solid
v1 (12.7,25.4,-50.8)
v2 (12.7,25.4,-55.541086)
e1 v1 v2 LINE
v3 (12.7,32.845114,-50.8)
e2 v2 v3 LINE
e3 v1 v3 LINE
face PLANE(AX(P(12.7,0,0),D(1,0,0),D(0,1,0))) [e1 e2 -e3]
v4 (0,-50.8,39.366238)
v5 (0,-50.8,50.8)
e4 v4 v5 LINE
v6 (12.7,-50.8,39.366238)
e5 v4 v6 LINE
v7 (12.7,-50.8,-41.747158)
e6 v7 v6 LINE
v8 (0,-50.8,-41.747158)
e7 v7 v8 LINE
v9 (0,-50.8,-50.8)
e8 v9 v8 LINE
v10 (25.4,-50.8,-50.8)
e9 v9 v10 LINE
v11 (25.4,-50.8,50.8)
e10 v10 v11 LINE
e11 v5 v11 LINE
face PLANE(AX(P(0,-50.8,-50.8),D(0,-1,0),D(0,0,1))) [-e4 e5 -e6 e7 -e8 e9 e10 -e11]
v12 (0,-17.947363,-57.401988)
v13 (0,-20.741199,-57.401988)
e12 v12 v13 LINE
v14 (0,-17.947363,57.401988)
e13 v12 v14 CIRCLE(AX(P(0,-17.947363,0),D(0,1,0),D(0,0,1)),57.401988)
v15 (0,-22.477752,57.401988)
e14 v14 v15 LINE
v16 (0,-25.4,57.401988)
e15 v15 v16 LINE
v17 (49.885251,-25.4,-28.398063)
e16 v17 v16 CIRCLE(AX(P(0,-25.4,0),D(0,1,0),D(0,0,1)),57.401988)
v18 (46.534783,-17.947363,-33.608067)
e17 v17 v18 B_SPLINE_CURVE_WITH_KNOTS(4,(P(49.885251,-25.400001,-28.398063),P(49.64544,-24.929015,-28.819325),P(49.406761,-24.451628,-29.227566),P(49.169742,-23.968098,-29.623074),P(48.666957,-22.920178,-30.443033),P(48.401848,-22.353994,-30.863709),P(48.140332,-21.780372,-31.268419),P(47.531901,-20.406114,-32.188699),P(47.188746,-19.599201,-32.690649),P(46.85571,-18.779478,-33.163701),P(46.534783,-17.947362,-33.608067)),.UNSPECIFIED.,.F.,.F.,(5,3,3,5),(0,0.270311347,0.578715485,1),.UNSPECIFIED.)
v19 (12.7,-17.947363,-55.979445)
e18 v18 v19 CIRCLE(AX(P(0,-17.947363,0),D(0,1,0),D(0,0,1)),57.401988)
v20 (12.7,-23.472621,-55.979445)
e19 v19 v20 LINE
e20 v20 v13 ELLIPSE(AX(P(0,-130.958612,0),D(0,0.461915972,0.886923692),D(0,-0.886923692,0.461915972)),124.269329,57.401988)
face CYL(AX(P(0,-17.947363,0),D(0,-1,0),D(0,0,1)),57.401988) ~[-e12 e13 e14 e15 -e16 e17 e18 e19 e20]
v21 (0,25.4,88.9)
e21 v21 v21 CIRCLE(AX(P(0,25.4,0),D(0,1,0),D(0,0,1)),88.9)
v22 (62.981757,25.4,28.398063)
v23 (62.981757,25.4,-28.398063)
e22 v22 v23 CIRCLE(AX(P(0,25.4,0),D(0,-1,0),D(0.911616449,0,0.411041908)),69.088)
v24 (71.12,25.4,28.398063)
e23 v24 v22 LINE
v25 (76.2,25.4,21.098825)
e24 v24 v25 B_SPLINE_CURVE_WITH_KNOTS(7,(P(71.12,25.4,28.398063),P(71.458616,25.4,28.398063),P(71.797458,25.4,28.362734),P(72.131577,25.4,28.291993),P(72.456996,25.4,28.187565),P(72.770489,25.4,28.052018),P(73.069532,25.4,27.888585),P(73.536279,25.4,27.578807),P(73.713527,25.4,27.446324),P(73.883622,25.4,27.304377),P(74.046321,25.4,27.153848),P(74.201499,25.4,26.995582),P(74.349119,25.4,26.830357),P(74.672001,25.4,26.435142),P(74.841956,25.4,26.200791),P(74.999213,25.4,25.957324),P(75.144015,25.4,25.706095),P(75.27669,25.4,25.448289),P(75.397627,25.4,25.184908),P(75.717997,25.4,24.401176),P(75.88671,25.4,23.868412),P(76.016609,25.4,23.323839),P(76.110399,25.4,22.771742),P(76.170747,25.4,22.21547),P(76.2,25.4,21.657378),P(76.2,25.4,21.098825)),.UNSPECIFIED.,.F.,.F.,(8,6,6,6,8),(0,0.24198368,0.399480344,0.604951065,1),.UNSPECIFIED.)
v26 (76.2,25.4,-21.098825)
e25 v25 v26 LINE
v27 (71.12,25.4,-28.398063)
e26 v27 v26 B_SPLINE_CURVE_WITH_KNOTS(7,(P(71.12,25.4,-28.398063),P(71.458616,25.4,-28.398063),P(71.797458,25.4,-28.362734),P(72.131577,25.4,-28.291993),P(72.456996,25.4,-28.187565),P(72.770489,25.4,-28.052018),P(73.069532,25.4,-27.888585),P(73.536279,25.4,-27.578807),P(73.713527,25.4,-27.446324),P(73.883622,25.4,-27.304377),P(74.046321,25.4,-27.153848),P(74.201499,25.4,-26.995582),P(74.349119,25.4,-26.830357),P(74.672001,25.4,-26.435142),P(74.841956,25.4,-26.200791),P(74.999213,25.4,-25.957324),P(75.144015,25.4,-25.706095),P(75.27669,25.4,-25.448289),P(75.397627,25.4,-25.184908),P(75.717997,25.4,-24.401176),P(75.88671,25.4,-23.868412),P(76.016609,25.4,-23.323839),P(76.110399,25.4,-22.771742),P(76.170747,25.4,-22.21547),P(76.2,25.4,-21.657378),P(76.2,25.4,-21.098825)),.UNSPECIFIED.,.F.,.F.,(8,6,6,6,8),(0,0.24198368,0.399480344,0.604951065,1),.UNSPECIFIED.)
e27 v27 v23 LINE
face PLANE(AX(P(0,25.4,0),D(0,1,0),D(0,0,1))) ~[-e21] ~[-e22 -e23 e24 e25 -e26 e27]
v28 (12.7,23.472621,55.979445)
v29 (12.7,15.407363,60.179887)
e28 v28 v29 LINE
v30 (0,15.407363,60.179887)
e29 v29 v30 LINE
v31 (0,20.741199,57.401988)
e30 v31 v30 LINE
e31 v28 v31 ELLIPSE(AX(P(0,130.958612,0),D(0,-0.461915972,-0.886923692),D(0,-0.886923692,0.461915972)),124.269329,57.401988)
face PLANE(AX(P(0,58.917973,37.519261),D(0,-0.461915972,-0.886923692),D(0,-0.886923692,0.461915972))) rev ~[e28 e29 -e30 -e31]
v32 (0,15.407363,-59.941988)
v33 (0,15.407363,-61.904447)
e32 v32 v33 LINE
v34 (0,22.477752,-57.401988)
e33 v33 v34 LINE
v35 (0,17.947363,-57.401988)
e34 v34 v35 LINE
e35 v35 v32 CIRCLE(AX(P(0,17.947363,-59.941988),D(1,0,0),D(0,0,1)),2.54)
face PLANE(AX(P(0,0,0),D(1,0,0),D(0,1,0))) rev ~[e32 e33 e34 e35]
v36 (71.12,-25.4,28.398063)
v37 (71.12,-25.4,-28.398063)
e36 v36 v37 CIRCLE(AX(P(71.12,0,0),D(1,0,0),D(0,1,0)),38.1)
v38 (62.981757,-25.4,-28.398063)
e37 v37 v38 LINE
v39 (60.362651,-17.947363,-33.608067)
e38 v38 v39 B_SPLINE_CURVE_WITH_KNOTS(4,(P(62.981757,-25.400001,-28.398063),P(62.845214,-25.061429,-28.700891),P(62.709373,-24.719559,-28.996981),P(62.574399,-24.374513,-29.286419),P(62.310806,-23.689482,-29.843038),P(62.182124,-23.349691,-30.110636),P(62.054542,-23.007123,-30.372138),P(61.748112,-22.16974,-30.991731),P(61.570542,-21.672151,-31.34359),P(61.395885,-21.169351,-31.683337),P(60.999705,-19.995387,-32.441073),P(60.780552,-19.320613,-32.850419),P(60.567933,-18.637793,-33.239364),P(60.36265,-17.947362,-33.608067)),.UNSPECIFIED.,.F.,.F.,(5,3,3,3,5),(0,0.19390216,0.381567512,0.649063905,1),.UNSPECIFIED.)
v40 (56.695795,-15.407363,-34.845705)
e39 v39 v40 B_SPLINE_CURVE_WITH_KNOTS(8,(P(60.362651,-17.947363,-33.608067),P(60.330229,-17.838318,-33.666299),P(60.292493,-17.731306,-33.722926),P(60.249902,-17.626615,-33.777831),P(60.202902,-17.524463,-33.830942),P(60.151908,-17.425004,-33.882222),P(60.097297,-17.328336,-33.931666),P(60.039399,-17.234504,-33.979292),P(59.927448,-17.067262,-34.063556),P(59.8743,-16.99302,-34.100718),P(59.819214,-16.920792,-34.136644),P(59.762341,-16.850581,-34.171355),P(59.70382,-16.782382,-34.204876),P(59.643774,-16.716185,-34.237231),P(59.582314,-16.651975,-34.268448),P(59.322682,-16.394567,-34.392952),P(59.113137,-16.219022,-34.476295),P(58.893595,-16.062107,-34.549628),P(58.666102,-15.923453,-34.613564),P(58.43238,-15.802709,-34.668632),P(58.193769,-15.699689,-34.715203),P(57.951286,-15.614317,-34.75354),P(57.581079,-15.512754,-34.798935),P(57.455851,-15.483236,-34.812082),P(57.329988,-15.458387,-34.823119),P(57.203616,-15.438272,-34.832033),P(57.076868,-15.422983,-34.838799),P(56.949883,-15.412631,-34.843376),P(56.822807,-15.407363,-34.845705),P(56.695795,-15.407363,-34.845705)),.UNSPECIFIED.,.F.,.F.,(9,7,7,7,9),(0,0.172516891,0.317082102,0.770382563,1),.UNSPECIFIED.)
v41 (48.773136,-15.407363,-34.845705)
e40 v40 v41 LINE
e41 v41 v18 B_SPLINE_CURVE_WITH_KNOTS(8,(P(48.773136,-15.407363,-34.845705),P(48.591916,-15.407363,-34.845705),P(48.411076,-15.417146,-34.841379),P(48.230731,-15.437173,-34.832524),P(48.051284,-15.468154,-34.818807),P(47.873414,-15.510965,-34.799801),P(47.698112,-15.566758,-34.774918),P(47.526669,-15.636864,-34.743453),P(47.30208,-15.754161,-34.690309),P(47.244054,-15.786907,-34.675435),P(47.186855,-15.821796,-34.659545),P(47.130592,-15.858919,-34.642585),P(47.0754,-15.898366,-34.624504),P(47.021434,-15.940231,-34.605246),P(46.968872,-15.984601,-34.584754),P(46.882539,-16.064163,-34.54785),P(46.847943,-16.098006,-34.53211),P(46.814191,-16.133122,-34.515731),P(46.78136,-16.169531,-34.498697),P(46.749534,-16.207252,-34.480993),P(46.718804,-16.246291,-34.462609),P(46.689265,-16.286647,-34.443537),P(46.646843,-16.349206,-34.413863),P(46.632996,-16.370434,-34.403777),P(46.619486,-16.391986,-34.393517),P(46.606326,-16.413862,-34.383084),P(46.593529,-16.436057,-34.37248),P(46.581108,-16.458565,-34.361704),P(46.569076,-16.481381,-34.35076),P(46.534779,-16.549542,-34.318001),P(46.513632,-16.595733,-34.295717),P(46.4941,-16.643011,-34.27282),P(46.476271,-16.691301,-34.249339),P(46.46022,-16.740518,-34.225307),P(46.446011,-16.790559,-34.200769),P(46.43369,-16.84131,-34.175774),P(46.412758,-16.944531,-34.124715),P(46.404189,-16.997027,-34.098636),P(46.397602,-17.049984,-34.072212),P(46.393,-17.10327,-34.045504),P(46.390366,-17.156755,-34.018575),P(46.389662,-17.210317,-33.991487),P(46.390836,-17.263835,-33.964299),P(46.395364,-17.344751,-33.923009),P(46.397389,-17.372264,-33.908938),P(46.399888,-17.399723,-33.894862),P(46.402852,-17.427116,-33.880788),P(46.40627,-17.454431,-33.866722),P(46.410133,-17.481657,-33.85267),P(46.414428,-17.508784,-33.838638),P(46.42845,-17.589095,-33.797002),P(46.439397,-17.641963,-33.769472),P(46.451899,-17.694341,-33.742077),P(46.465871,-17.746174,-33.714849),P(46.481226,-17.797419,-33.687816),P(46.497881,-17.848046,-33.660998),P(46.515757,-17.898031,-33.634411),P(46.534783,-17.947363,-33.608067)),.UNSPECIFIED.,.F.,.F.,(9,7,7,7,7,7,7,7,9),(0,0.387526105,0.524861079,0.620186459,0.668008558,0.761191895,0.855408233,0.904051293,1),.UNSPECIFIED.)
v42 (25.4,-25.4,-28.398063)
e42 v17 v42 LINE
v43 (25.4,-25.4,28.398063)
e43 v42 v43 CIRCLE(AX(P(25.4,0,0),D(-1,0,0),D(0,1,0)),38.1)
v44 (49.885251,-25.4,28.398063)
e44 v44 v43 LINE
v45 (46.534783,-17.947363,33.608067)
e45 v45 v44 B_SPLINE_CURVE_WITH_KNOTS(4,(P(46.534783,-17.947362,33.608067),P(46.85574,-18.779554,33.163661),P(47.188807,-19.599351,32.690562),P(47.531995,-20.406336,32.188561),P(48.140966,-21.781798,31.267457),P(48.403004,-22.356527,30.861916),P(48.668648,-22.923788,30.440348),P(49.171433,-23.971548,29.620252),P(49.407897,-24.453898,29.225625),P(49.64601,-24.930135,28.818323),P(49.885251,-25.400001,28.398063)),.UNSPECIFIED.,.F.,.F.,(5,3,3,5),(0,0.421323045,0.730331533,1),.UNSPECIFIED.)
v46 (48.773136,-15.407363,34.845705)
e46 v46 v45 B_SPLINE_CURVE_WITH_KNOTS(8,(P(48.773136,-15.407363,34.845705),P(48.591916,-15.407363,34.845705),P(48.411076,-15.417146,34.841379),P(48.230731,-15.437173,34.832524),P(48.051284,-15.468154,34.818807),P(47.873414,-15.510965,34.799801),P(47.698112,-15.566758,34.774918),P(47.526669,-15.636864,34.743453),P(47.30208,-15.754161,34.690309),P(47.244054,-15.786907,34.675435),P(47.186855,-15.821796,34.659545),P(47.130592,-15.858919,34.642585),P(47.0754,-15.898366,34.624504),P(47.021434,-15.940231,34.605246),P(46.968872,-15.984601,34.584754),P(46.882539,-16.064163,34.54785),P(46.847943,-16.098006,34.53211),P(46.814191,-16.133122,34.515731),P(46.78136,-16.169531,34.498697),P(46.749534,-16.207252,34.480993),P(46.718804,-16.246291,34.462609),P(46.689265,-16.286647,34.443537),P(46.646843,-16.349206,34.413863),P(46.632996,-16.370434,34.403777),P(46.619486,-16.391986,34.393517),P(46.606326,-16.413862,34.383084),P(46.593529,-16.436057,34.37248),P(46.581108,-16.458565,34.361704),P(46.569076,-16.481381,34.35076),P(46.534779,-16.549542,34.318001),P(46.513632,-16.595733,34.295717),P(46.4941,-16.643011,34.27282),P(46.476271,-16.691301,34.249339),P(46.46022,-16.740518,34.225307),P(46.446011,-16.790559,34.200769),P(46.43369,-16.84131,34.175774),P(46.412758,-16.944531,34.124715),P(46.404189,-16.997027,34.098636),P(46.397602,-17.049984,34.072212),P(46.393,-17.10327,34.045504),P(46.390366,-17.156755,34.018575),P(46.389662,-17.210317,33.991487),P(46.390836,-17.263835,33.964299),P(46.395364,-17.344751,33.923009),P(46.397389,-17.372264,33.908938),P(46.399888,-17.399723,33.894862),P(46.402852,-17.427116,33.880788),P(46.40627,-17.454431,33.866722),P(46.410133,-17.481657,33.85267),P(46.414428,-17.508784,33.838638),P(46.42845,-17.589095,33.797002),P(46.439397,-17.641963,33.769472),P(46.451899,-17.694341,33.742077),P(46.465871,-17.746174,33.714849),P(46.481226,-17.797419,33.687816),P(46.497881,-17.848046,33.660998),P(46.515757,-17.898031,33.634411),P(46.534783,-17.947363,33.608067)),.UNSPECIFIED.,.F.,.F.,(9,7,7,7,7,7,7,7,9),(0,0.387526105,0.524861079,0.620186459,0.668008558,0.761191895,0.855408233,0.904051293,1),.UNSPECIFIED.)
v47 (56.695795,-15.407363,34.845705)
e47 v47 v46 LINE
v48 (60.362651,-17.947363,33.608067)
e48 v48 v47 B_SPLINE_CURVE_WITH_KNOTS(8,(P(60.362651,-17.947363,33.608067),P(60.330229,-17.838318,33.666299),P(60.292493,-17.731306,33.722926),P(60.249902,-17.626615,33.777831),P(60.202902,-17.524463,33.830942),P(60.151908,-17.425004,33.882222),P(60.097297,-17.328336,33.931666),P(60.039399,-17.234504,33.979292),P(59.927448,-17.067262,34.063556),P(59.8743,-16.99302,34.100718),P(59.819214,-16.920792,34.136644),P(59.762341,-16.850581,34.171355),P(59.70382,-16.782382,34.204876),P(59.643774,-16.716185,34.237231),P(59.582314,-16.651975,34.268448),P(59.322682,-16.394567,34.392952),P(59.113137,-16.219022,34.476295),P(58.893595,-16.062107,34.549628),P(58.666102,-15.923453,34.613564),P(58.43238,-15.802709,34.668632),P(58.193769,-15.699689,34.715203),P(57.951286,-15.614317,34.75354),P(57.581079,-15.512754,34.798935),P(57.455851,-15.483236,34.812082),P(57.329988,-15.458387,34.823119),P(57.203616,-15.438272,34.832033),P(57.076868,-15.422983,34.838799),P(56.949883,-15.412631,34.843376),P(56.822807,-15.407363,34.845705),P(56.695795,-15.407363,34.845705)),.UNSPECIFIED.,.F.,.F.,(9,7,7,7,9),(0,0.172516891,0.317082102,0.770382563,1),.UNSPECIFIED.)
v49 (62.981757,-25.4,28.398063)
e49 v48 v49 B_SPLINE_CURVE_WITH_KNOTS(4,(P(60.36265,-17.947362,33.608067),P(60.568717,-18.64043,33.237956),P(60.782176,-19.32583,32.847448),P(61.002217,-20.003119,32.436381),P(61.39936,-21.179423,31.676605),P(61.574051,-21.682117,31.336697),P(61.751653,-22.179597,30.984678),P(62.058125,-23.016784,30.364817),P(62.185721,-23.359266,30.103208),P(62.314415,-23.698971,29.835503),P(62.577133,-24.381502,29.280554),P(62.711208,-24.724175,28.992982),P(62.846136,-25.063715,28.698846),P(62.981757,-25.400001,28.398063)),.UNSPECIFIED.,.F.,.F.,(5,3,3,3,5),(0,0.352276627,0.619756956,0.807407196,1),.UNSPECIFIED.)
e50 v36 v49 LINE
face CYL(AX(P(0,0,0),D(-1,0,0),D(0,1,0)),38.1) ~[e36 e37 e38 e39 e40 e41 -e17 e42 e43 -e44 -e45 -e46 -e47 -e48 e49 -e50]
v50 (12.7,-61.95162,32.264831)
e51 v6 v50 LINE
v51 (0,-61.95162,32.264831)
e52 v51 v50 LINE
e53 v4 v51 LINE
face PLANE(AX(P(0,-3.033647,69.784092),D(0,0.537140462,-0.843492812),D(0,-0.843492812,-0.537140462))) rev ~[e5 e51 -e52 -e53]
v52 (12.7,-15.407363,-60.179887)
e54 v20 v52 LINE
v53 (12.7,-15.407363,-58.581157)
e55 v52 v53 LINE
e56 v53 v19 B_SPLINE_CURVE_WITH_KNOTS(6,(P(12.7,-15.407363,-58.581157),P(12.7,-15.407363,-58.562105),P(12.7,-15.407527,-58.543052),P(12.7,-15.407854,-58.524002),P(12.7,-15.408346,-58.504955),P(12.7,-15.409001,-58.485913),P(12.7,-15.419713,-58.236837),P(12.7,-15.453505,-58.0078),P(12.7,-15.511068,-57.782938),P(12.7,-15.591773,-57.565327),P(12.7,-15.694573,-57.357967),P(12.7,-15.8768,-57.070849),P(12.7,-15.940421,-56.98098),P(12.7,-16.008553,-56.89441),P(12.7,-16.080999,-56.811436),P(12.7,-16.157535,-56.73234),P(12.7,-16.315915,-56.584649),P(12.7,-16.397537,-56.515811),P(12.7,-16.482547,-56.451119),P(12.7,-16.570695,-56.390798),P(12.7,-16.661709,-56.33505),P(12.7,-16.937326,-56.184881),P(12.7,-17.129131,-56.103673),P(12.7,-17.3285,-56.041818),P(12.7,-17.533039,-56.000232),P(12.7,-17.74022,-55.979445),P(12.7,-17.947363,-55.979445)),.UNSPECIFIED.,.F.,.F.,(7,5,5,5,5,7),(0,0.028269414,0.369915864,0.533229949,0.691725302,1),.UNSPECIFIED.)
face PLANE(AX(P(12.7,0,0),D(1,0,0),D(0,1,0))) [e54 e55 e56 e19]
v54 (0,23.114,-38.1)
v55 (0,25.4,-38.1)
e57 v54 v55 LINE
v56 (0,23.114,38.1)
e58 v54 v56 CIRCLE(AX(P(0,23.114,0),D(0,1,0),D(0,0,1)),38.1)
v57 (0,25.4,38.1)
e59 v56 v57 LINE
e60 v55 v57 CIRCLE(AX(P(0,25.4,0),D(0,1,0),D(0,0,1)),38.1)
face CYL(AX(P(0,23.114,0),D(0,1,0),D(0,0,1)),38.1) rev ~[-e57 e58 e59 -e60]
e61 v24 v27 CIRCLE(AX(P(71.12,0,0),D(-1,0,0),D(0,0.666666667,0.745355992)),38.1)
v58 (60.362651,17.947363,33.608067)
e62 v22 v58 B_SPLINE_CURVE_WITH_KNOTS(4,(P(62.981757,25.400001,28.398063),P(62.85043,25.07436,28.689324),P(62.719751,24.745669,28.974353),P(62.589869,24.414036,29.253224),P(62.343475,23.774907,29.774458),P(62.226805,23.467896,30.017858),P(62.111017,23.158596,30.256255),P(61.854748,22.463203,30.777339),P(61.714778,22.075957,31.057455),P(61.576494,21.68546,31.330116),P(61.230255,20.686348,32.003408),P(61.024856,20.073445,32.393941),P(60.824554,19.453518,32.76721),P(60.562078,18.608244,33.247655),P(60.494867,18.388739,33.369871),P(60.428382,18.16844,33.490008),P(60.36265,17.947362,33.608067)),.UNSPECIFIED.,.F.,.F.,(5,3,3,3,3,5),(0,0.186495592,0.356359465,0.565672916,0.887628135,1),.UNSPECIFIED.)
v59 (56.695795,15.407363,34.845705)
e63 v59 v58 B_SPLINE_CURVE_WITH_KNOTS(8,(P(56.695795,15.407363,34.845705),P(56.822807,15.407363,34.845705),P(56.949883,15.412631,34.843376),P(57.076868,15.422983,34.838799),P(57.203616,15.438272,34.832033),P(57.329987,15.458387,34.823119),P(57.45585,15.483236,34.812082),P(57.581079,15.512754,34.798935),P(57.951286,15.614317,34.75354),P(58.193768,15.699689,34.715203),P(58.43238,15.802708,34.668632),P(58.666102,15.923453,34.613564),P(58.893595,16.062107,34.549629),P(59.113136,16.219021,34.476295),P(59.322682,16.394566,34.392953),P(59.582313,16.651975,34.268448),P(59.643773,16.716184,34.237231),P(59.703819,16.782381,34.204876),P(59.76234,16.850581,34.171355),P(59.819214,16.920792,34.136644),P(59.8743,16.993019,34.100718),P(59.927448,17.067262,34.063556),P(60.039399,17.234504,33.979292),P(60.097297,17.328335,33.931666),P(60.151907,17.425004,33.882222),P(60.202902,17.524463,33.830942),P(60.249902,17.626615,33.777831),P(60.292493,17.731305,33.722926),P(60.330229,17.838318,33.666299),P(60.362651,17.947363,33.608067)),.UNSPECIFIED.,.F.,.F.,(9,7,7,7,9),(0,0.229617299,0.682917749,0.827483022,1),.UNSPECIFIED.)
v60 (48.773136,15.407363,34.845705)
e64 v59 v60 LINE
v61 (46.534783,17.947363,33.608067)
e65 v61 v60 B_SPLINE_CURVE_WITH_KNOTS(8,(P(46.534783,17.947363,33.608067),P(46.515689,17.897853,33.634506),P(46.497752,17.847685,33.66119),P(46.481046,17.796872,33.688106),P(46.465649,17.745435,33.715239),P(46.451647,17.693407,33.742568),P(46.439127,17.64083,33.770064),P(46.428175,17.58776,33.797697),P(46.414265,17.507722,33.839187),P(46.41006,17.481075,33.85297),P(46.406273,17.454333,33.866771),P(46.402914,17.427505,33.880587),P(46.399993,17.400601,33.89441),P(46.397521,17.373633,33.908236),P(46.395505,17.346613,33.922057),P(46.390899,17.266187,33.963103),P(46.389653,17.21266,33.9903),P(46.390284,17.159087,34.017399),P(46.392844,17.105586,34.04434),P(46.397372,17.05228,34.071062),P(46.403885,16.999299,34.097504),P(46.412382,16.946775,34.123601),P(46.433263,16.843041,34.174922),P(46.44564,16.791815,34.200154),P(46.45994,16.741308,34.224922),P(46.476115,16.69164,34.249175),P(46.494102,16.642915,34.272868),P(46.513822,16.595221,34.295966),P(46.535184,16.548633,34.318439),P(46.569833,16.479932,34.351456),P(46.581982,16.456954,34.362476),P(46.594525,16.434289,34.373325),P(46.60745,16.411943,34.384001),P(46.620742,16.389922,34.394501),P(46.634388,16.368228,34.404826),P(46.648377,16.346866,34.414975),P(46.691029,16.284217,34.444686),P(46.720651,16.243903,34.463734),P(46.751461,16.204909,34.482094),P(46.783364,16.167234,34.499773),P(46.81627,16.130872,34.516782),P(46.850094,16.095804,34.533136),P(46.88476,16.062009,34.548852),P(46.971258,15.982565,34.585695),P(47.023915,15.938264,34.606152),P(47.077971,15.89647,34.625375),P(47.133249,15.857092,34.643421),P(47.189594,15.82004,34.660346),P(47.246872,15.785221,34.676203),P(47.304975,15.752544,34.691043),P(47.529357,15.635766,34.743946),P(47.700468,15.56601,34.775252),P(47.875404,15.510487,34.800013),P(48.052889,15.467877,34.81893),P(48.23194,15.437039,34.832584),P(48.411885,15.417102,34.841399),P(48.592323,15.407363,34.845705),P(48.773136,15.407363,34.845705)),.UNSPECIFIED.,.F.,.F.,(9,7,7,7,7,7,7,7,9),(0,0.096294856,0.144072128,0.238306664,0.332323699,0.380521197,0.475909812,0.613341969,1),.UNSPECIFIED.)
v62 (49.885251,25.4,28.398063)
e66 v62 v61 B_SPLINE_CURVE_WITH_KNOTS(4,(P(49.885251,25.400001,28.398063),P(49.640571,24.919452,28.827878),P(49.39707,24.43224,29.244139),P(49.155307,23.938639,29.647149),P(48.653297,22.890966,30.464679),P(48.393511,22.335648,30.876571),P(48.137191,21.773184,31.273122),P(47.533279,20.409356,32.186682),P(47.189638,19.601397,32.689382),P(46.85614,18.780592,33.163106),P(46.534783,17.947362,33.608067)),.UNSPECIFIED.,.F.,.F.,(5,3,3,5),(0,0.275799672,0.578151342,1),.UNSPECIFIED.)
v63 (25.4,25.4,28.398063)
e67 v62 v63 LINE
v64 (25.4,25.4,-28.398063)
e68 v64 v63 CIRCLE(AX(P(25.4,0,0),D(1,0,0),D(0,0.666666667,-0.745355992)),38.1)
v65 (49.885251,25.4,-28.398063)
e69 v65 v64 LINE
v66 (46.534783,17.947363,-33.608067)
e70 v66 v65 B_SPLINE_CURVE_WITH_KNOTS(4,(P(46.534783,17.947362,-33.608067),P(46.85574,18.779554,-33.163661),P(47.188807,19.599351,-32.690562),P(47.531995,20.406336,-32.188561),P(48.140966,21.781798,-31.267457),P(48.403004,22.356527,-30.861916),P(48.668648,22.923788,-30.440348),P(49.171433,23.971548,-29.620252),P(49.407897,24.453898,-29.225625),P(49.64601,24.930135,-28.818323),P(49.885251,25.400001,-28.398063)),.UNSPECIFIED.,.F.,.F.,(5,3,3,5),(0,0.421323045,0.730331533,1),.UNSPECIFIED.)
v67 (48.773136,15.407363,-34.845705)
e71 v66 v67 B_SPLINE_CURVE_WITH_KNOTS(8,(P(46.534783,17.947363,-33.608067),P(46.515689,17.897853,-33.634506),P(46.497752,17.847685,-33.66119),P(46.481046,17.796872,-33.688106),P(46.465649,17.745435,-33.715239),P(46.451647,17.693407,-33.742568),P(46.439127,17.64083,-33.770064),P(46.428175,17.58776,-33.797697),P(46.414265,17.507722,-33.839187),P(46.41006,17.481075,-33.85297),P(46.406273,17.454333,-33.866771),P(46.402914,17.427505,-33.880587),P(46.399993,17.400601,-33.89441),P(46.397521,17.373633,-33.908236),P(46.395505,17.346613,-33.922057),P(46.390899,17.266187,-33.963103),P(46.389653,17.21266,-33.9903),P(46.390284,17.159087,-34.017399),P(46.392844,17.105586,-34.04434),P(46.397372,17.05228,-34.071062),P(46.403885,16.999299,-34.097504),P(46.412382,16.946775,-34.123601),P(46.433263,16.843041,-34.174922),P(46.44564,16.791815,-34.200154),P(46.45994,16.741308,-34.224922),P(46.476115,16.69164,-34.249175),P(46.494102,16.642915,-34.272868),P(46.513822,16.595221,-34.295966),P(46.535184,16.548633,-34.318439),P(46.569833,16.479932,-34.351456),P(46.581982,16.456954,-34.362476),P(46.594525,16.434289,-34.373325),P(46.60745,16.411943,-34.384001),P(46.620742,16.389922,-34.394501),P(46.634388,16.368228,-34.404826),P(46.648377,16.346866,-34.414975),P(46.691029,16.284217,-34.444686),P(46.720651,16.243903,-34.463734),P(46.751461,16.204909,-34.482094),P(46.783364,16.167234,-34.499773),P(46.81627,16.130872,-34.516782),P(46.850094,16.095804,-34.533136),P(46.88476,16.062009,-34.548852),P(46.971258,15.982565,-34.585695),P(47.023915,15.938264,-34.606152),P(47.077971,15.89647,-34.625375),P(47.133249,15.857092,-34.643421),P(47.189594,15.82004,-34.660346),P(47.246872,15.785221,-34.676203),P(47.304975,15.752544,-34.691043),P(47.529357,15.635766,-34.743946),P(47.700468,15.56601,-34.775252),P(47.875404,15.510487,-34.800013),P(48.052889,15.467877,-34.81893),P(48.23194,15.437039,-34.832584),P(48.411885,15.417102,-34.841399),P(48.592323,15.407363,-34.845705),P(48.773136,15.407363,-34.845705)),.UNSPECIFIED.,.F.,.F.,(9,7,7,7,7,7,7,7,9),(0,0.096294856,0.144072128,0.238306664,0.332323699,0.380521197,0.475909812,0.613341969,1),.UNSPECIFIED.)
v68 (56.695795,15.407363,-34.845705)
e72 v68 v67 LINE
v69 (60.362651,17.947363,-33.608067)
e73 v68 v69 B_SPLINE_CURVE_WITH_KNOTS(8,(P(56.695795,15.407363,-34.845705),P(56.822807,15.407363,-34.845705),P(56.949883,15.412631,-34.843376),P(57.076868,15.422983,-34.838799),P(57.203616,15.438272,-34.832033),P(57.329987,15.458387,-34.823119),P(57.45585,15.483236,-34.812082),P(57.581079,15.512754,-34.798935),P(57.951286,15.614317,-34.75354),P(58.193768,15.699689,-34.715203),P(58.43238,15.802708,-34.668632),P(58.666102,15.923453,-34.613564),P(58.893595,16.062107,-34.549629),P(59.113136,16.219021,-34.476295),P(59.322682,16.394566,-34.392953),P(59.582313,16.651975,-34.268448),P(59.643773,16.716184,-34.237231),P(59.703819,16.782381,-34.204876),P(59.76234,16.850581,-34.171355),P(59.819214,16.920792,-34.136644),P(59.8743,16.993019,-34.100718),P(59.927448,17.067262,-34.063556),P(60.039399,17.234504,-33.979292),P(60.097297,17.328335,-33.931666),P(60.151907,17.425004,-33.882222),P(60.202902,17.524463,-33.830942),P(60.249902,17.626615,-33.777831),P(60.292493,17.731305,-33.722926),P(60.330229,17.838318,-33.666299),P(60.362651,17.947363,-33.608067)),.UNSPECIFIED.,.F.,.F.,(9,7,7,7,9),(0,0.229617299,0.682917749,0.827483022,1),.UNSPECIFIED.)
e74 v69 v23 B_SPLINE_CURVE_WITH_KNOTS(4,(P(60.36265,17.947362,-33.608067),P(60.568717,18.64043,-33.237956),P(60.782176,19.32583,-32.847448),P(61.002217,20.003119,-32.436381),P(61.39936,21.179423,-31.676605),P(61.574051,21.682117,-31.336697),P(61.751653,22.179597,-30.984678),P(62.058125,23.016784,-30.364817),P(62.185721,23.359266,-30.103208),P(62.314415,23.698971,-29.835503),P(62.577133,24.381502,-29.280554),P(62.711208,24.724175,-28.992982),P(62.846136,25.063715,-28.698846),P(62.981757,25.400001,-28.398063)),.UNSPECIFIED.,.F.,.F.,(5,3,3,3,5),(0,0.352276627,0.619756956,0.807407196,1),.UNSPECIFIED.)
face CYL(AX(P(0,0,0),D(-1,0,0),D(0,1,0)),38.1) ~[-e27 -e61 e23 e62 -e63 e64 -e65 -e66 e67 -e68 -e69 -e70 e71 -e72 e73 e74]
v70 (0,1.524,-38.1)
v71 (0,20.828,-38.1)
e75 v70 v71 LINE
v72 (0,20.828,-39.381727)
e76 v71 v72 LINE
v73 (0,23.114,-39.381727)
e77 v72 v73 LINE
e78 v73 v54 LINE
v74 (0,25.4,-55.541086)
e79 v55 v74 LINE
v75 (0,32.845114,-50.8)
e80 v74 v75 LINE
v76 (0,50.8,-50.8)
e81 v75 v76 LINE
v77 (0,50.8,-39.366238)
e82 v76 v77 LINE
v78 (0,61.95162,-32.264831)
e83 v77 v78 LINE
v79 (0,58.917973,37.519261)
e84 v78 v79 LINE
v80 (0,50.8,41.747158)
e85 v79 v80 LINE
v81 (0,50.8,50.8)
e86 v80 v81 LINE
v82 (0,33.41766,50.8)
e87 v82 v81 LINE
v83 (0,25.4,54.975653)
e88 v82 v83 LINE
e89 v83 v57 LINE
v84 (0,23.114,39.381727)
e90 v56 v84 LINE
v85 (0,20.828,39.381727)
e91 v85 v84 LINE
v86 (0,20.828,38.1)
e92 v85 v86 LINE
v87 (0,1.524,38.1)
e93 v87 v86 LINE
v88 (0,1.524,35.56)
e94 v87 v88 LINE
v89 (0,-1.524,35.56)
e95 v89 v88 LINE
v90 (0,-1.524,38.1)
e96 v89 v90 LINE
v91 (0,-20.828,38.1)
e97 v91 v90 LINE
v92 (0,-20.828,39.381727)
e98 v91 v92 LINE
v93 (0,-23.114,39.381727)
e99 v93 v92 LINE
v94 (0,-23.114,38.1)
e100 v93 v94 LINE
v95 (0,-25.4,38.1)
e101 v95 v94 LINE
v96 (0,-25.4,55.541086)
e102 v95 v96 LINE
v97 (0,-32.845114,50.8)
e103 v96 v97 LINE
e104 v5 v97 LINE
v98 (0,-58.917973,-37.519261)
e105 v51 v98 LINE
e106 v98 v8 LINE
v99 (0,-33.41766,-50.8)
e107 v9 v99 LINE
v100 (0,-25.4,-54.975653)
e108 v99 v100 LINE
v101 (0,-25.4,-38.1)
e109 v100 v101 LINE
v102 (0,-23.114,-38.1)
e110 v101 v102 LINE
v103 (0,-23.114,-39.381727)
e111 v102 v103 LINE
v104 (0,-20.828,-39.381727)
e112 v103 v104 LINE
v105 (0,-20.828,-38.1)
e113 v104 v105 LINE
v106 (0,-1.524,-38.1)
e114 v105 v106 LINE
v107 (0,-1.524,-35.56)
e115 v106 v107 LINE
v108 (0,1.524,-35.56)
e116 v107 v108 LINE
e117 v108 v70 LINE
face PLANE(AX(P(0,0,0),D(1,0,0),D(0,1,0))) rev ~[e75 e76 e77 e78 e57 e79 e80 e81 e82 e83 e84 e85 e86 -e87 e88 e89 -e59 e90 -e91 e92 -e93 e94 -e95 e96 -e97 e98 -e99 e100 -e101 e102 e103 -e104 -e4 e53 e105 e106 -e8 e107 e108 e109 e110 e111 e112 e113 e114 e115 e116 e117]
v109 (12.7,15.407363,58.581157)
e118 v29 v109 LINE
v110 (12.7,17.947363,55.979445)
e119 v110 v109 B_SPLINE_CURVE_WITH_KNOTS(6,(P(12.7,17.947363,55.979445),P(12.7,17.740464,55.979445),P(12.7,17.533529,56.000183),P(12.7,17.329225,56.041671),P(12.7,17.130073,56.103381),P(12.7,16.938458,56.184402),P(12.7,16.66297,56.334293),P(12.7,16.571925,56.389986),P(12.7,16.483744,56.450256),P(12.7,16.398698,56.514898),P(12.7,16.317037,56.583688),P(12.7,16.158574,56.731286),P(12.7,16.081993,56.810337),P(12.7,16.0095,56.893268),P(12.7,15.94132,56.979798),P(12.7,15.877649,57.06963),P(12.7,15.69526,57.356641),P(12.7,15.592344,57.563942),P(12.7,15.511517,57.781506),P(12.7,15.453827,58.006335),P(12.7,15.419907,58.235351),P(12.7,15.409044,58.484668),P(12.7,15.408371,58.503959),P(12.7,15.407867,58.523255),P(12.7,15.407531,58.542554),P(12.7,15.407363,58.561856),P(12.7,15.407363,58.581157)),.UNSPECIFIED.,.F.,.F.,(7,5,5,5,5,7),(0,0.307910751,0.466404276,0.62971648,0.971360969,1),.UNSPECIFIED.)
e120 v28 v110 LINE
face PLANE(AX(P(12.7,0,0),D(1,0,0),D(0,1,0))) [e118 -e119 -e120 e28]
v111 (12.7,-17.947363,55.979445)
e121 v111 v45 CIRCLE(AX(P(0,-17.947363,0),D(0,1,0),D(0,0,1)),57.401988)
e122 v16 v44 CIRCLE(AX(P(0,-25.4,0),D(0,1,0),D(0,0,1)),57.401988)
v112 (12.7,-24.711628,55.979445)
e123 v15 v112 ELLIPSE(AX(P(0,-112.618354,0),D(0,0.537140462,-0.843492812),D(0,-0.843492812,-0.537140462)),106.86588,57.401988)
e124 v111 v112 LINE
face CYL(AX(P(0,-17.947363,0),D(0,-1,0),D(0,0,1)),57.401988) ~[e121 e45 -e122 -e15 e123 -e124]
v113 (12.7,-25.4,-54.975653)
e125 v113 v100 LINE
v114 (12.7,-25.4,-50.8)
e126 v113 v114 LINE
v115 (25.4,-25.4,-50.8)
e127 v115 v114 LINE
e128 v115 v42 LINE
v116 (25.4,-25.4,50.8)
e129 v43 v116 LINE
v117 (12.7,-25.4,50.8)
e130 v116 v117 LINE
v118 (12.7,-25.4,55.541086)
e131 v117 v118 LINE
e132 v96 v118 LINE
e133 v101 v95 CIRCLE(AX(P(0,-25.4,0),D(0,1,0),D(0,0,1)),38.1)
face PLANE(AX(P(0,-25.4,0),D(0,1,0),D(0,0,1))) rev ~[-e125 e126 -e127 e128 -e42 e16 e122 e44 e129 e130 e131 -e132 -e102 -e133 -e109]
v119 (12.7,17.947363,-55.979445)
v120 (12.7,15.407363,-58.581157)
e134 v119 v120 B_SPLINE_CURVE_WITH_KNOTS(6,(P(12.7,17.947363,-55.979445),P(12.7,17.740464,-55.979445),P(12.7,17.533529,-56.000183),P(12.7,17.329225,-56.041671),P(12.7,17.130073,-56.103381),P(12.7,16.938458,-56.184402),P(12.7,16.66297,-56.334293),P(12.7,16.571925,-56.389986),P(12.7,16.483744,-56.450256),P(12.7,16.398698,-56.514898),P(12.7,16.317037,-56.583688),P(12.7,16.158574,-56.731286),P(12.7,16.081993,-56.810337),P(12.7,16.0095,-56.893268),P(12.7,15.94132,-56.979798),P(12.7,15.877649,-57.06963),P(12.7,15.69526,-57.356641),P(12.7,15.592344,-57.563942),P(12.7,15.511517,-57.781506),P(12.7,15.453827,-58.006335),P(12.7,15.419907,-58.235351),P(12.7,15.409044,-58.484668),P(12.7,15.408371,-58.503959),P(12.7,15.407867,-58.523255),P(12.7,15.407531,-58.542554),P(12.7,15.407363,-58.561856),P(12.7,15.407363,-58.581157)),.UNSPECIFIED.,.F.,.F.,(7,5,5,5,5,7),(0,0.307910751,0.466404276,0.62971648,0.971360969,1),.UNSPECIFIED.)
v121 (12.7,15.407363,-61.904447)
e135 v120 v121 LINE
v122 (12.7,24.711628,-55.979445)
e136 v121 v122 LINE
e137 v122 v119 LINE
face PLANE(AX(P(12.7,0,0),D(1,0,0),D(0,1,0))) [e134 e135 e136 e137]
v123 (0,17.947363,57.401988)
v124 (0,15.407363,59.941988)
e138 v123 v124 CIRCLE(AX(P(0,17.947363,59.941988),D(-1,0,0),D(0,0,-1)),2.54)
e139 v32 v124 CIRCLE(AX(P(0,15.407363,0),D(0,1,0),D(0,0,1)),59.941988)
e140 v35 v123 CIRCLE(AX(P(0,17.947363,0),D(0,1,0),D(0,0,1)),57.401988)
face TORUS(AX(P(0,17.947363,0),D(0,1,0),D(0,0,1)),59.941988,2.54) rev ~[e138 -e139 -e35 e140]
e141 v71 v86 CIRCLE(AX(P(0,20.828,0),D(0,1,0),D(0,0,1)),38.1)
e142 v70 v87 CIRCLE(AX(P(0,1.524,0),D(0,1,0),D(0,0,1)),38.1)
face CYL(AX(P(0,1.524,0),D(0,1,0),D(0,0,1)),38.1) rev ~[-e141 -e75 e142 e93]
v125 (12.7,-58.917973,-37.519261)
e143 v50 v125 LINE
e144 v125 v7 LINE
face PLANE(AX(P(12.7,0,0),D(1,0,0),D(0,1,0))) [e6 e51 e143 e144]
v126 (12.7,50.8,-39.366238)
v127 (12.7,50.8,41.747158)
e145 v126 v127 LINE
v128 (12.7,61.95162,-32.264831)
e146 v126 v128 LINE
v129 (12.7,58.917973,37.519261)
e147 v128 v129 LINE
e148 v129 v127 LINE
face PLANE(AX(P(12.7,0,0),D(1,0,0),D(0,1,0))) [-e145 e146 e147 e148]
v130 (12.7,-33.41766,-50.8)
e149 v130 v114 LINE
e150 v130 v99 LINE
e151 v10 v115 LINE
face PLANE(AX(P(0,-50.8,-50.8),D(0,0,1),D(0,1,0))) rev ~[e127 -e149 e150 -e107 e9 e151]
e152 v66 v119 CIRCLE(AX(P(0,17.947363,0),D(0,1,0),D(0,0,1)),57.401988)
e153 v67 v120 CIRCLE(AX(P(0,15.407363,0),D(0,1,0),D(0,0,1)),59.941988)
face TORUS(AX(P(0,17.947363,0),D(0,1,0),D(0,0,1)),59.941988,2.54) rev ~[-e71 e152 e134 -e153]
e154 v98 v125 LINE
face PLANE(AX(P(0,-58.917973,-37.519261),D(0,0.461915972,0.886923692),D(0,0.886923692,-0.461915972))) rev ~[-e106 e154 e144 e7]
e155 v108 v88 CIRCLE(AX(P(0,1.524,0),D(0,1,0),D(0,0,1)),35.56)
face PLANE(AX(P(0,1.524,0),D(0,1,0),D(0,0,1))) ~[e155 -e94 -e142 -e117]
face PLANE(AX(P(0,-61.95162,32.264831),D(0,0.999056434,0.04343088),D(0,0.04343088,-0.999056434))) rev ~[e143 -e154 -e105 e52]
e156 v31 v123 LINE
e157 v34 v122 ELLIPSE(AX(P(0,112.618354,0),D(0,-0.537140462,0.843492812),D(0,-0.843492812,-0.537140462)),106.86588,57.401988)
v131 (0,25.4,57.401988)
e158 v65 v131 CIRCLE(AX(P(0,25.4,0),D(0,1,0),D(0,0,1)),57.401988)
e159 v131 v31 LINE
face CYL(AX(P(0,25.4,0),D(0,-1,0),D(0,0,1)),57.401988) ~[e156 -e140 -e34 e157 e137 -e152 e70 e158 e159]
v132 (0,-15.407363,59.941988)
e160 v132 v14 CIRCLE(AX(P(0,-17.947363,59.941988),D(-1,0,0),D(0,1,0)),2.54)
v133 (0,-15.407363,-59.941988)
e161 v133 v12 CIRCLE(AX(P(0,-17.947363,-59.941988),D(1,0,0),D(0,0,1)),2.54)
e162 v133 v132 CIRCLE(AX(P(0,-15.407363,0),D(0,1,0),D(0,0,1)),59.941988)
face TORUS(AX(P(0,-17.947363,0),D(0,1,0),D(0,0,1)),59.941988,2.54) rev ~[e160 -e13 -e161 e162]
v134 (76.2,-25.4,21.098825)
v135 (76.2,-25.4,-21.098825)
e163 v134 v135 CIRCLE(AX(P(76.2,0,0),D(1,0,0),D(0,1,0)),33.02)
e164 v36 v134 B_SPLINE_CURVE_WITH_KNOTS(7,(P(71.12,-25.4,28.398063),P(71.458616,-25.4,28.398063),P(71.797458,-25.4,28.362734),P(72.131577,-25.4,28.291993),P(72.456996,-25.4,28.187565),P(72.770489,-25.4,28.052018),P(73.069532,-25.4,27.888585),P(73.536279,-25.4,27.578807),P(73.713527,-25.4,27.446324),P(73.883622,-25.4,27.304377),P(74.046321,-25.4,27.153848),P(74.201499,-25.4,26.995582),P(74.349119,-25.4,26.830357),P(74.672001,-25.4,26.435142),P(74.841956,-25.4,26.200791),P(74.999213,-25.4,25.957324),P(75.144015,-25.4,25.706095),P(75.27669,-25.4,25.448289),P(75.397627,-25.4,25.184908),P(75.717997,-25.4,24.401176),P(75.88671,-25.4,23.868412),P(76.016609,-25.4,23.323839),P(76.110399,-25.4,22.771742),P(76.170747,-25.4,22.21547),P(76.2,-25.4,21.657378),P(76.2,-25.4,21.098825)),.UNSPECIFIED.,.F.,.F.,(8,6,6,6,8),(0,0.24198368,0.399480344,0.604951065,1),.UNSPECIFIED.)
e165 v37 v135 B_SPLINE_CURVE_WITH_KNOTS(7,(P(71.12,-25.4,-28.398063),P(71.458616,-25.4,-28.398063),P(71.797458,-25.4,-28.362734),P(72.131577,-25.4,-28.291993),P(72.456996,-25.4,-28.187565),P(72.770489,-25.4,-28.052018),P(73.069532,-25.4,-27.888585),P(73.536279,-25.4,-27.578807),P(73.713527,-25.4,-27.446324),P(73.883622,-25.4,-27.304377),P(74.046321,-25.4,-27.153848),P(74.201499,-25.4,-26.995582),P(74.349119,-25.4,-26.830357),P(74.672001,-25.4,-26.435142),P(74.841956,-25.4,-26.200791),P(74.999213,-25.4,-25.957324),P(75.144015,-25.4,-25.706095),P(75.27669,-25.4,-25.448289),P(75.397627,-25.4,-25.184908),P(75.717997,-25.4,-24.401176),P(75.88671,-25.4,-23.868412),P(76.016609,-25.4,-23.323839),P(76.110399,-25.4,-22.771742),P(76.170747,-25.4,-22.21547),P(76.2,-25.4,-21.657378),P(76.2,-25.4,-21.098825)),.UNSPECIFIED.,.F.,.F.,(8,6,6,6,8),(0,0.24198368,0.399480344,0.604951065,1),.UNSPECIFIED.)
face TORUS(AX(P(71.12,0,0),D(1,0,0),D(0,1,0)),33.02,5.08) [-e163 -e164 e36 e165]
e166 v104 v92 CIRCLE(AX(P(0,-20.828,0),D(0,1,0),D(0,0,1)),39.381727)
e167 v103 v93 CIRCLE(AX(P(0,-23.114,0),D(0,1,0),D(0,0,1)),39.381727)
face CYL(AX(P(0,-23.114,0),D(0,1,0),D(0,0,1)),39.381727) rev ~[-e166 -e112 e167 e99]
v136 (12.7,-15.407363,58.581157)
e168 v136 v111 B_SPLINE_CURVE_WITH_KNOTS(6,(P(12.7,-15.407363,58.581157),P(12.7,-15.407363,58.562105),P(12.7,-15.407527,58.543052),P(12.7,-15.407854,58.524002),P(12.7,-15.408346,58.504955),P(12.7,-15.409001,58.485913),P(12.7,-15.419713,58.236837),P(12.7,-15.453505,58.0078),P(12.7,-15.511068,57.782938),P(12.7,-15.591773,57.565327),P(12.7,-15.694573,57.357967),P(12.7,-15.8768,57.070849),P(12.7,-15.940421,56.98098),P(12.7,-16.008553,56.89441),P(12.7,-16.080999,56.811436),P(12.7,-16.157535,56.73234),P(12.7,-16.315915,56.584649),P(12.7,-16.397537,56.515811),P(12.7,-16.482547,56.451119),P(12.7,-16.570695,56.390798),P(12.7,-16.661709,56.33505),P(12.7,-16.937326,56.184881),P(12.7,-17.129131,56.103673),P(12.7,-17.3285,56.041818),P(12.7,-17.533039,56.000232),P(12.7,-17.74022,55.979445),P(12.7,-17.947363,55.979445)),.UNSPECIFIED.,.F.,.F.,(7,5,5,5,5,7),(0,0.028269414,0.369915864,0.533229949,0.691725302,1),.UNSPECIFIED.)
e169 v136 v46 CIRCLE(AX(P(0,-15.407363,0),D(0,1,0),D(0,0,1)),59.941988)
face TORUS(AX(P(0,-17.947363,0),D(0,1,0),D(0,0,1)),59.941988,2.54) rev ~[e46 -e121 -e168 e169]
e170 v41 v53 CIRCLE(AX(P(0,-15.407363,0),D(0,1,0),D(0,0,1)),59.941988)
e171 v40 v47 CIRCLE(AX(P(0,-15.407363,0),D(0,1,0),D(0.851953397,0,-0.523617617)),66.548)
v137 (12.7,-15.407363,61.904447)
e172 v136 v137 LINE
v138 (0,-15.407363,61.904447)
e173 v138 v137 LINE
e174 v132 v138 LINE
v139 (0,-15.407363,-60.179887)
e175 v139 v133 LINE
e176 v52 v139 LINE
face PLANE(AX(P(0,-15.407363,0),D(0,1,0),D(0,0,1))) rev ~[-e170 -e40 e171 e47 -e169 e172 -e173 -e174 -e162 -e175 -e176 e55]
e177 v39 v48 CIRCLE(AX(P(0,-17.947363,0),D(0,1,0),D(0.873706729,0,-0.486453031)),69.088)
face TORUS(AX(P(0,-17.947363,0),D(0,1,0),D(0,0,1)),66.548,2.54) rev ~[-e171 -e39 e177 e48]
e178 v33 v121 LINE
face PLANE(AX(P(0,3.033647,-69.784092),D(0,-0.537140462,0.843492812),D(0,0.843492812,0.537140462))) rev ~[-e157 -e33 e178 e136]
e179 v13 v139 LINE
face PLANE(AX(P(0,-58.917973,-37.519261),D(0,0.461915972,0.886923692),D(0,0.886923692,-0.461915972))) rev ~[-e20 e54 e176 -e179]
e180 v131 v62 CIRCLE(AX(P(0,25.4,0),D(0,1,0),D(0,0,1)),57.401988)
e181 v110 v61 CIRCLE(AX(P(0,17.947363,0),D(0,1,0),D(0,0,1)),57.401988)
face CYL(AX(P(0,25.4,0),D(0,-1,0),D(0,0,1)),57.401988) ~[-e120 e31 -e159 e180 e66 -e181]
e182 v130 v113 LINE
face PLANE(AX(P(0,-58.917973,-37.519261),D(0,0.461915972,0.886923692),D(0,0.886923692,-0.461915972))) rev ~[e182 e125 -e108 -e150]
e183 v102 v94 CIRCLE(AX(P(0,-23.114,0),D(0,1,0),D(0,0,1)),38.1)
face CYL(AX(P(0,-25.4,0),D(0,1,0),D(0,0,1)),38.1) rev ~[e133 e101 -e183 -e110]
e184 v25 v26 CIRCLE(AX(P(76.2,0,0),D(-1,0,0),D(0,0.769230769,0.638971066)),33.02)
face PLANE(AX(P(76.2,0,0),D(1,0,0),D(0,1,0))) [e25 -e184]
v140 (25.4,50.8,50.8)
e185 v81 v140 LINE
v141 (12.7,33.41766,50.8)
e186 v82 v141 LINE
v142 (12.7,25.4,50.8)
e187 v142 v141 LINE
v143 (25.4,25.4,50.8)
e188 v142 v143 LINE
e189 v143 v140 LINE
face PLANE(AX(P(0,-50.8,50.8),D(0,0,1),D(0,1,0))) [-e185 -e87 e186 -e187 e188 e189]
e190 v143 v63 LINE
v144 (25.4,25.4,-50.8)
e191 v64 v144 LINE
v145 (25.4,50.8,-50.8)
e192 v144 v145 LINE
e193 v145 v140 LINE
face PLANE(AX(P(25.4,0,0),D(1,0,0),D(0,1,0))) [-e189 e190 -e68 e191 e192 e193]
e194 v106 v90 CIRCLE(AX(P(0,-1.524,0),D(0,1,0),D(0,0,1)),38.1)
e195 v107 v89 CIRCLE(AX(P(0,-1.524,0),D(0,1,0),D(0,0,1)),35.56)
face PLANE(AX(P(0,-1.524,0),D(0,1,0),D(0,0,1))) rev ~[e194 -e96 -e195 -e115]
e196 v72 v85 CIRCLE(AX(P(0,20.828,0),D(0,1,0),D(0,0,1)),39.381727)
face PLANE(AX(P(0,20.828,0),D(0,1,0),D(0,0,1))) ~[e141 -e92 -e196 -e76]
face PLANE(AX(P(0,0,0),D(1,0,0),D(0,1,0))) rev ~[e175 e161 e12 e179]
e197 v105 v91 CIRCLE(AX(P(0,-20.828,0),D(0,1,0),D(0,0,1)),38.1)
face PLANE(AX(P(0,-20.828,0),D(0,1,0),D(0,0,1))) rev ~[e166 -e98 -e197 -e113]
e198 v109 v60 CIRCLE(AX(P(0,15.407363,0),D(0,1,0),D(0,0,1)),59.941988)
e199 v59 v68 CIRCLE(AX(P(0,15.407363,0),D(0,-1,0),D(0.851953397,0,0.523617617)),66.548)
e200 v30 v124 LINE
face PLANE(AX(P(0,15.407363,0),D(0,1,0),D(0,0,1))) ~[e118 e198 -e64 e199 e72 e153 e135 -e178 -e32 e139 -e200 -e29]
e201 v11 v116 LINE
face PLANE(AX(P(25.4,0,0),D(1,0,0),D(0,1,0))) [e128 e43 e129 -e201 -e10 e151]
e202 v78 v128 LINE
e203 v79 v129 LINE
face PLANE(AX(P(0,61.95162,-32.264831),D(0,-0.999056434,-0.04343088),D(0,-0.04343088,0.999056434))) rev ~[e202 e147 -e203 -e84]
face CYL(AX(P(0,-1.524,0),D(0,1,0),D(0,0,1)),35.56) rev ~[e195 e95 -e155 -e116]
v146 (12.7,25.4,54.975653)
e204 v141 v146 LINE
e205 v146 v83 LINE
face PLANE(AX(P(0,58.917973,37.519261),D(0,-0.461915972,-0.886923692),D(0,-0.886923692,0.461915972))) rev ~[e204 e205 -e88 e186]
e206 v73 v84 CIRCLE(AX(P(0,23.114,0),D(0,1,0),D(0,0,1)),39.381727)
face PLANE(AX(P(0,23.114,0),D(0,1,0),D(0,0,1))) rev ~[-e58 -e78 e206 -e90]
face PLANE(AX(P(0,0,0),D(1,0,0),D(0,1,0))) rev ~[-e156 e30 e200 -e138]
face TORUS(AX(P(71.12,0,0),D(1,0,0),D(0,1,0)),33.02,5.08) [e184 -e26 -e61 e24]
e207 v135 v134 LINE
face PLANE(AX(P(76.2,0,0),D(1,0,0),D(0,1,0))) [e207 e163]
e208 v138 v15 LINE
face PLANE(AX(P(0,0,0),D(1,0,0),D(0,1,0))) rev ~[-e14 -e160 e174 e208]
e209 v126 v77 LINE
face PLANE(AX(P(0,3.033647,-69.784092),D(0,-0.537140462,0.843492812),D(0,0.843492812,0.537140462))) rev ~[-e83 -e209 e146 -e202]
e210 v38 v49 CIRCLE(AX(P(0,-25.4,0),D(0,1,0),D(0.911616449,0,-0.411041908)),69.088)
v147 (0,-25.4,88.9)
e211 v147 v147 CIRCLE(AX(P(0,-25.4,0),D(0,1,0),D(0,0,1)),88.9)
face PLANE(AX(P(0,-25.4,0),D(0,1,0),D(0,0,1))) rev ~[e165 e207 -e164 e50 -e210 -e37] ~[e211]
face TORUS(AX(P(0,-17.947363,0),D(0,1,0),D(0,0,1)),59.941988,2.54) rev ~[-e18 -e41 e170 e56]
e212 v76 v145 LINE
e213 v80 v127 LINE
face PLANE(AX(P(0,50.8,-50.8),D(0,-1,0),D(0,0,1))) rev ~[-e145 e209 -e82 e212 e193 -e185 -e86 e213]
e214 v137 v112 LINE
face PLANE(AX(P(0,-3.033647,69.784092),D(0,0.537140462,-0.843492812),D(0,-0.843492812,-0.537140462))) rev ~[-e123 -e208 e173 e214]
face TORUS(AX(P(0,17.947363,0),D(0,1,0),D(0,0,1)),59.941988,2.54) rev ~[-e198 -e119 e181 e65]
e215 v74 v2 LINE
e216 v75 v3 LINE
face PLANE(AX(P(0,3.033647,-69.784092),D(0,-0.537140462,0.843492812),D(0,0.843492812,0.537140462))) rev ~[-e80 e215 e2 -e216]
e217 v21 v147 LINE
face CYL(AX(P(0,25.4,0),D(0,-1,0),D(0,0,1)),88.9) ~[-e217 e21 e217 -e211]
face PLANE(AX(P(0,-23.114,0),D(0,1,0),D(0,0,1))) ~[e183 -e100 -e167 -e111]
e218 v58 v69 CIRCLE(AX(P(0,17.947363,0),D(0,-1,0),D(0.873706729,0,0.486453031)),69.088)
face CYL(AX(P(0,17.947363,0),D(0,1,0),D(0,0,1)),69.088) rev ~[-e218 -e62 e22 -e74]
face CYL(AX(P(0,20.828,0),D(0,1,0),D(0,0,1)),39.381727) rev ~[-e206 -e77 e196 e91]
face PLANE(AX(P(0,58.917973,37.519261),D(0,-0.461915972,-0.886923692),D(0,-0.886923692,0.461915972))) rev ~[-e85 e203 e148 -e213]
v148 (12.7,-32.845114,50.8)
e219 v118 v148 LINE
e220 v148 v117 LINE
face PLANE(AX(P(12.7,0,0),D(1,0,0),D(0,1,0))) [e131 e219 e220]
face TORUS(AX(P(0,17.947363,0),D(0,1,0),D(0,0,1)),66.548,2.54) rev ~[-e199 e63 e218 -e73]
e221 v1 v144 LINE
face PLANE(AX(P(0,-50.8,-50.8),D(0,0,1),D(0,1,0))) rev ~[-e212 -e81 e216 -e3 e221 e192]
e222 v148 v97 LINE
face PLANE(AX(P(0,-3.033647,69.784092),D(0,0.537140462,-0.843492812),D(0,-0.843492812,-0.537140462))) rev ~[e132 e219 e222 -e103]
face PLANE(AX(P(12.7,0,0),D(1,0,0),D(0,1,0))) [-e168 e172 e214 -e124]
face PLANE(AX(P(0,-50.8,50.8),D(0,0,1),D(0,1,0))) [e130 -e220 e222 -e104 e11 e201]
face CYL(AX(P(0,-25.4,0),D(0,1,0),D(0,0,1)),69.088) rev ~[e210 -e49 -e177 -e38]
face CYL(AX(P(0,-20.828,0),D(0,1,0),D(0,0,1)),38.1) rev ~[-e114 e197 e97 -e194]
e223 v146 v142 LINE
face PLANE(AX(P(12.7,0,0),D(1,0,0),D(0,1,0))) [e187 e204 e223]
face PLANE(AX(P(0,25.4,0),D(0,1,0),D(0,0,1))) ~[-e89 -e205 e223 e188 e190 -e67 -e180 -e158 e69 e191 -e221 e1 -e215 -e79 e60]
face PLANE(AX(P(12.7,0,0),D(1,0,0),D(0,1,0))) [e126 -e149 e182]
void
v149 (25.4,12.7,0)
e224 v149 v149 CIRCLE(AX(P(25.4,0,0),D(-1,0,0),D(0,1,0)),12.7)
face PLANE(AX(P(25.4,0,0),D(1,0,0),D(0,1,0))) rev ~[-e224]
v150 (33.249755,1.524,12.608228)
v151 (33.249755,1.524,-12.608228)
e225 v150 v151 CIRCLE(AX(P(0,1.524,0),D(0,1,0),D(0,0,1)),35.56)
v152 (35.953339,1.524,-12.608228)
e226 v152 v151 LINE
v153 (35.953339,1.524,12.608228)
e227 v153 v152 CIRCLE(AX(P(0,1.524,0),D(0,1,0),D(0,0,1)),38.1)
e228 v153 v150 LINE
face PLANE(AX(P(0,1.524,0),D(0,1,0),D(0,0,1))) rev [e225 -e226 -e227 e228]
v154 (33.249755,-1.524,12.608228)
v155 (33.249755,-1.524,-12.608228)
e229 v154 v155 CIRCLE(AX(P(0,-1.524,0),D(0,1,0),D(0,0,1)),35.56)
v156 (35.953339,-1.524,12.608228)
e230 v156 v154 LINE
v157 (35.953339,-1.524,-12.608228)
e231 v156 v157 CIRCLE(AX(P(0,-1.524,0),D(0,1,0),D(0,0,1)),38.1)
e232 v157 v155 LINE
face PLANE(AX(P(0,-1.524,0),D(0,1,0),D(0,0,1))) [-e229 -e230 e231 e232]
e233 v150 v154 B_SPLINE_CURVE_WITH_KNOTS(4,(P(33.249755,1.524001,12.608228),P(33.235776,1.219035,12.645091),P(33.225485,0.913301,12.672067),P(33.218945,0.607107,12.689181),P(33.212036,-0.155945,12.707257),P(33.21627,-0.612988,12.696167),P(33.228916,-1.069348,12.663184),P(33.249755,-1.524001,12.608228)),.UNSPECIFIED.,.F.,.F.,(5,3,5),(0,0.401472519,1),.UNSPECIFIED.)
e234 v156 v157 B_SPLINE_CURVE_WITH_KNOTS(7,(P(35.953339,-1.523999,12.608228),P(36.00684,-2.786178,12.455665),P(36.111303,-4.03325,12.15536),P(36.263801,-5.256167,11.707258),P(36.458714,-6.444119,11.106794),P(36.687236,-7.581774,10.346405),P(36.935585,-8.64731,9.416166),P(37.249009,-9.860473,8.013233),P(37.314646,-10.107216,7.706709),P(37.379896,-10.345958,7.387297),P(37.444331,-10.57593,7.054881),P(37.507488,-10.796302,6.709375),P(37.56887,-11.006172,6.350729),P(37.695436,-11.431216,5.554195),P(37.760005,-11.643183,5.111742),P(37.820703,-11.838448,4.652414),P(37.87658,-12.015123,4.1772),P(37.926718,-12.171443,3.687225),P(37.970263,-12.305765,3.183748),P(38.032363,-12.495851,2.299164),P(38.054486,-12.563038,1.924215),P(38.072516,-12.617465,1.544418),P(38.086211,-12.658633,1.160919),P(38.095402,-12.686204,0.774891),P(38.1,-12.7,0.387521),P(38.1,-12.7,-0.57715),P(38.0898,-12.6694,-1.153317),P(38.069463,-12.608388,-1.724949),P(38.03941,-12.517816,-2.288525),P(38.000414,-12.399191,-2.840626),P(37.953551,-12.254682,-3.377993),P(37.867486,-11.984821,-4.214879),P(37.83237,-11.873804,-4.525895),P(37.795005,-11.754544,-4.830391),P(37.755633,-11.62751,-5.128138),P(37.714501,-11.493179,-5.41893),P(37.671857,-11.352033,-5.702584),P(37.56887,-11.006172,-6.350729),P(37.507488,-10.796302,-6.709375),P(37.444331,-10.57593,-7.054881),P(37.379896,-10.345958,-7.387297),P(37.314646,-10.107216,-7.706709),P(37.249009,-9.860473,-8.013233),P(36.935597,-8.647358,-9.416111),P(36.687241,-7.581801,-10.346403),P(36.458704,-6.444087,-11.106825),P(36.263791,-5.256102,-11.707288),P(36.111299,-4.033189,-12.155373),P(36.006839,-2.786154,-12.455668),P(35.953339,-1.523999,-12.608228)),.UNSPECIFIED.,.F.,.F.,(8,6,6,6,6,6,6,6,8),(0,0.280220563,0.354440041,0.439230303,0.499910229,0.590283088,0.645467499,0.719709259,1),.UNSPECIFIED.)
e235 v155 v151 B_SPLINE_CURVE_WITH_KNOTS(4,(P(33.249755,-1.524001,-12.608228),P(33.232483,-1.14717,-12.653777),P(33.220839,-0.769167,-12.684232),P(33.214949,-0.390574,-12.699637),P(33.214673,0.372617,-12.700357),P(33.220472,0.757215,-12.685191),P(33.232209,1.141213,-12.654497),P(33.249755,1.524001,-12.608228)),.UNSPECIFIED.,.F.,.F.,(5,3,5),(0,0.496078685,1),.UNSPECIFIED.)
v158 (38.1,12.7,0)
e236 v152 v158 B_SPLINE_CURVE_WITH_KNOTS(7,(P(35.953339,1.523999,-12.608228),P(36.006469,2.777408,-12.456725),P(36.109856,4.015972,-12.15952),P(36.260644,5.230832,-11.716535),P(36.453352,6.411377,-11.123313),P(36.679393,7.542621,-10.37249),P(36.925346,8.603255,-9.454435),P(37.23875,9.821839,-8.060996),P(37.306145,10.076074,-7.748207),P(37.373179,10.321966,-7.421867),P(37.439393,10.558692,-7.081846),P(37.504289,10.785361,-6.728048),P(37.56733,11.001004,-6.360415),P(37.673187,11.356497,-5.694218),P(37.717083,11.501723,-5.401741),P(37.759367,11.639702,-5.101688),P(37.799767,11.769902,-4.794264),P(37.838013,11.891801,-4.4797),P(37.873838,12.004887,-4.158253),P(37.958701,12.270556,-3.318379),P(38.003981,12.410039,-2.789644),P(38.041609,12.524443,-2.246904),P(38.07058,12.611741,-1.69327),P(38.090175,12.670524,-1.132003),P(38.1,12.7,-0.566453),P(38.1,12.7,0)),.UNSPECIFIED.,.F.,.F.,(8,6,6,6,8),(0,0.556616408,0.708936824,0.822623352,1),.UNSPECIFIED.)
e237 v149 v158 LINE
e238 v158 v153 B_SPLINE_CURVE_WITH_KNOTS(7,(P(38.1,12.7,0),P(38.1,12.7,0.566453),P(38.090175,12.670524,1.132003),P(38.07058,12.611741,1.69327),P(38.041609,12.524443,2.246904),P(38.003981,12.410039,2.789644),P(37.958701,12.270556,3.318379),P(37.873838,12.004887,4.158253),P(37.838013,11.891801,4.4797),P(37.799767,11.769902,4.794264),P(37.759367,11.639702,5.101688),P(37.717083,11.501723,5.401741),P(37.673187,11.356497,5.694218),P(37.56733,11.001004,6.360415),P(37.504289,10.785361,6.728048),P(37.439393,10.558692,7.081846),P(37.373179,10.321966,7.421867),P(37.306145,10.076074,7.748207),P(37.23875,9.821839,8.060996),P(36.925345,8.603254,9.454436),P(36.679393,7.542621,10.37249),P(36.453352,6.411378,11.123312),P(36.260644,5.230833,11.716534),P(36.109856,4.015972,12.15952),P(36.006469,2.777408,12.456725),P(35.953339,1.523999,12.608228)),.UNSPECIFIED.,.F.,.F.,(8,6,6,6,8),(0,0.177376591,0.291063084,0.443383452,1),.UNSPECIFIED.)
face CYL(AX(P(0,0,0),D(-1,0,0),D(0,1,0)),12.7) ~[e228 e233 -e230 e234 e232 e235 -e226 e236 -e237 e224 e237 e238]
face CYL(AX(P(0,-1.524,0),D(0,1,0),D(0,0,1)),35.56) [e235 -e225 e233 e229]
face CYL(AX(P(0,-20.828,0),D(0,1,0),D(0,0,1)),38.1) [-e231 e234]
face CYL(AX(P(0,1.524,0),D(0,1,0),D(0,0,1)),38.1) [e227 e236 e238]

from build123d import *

# Parameters (mm, degrees)
F0_R     = 38.1
F0_R_2   = 12.7
F1_DEPTH = 76.2
F2_R     = 5.08
F4_W     = 101.6
F4_H     = 101.6
F5_DEPTH = 25.4
F7_DEPTH = 12.7


# Not quite as in the source:
# - the program builds the solid bodies; features that only make, move or delete a surface that nothing else refers to are left out


with BuildPart() as f1:
    # F0 (on Right) → F1 (new body)
    with BuildSketch(Plane.YZ):
        Circle(F0_R)
        Circle(F0_R_2, mode=Mode.SUBTRACT)
    extrude(amount=F1_DEPTH)

    # F2
    f2_edges = [f1.edges().sort_by_distance(p)[0] for p in [
        (76.2, -38.1, 0),
        (0, -38.1, 0),
    ]]
    fillet(f2_edges, radius=F2_R)

    # F4 (on Right) → F5 (join)
    with BuildSketch(Plane.YZ):
        Rectangle(F4_W, F4_H)
    extrude(amount=F5_DEPTH)

    # F6 (on Right) → F7 (join)
    with BuildSketch(Plane.YZ):
        Polygon((3.0336469462, -69.7840919279), (61.9516198627, -32.2648306425), (58.9179729165, 37.5192612854), (-3.0336469462, 69.7840919279), (-61.9516198627, 32.2648306425), (-58.9179729165, -37.5192612854), align=None)
    extrude(amount=F7_DEPTH)

    # F8 (on Right) → F9 (revolve)
    with BuildSketch(Plane.YZ):
        with BuildLine():
            Line((25.4, 88.9), (0, 88.9))
            Line((0, 88.9), (-25.4, 88.9))
            Line((-25.4, 88.9), (-25.4, 69.088))
            Line((-25.4, 69.088), (-17.9473628443, 69.088))
            ThreePointArc((-17.9473628443, 69.088), (-16.1513116201, 68.3440512242), (-15.4073628443, 66.548))
            Line((-15.4073628443, 66.548), (-15.4073628443, 59.9419880681))
            ThreePointArc((-15.4073628443, 59.9419880681), (-16.1513116201, 58.1459368439), (-17.9473628443, 57.4019880681))
            Line((-17.9473628443, 57.4019880681), (-25.4, 57.4019880681))
            Line((-25.4, 57.4019880681), (-25.4, 38.1))
            Line((-25.4, 38.1), (-23.114, 38.1))
            Line((-23.114, 38.1), (-23.114, 39.3817271054))
            Line((-23.114, 39.3817271054), (-20.828, 39.3817271054))
            Line((-20.828, 39.3817271054), (-20.828, 38.1))
            Line((-20.828, 38.1), (-1.524, 38.1))
            Line((-1.524, 38.1), (-1.524, 35.56))
            Line((-1.524, 35.56), (0, 35.56))
            Line((0, 35.56), (1.524, 35.56))
            Line((1.524, 35.56), (1.524, 38.1))
            Line((1.524, 38.1), (20.828, 38.1))
            Line((20.828, 38.1), (20.828, 39.3817271054))
            Line((20.828, 39.3817271054), (23.114, 39.3817271054))
            Line((23.114, 39.3817271054), (23.114, 38.1))
            Line((23.114, 38.1), (25.4, 38.1))
            Line((25.4, 38.1), (25.4, 57.4019880681))
            Line((25.4, 57.4019880681), (17.9473628443, 57.4019880681))
            ThreePointArc((17.9473628443, 57.4019880681), (16.1513116201, 58.1459368439), (15.4073628443, 59.9419880681))
            Line((15.4073628443, 59.9419880681), (15.4073628443, 66.548))
            ThreePointArc((15.4073628443, 66.548), (16.1513116201, 68.3440512242), (17.9473628443, 69.088))
            Line((17.9473628443, 69.088), (25.4, 69.088))
            Line((25.4, 69.088), (25.4, 88.9))
        make_face()
    revolve(axis=Axis((0, 12.7, 0), (0, 1, 0)))


solid = f1.part
